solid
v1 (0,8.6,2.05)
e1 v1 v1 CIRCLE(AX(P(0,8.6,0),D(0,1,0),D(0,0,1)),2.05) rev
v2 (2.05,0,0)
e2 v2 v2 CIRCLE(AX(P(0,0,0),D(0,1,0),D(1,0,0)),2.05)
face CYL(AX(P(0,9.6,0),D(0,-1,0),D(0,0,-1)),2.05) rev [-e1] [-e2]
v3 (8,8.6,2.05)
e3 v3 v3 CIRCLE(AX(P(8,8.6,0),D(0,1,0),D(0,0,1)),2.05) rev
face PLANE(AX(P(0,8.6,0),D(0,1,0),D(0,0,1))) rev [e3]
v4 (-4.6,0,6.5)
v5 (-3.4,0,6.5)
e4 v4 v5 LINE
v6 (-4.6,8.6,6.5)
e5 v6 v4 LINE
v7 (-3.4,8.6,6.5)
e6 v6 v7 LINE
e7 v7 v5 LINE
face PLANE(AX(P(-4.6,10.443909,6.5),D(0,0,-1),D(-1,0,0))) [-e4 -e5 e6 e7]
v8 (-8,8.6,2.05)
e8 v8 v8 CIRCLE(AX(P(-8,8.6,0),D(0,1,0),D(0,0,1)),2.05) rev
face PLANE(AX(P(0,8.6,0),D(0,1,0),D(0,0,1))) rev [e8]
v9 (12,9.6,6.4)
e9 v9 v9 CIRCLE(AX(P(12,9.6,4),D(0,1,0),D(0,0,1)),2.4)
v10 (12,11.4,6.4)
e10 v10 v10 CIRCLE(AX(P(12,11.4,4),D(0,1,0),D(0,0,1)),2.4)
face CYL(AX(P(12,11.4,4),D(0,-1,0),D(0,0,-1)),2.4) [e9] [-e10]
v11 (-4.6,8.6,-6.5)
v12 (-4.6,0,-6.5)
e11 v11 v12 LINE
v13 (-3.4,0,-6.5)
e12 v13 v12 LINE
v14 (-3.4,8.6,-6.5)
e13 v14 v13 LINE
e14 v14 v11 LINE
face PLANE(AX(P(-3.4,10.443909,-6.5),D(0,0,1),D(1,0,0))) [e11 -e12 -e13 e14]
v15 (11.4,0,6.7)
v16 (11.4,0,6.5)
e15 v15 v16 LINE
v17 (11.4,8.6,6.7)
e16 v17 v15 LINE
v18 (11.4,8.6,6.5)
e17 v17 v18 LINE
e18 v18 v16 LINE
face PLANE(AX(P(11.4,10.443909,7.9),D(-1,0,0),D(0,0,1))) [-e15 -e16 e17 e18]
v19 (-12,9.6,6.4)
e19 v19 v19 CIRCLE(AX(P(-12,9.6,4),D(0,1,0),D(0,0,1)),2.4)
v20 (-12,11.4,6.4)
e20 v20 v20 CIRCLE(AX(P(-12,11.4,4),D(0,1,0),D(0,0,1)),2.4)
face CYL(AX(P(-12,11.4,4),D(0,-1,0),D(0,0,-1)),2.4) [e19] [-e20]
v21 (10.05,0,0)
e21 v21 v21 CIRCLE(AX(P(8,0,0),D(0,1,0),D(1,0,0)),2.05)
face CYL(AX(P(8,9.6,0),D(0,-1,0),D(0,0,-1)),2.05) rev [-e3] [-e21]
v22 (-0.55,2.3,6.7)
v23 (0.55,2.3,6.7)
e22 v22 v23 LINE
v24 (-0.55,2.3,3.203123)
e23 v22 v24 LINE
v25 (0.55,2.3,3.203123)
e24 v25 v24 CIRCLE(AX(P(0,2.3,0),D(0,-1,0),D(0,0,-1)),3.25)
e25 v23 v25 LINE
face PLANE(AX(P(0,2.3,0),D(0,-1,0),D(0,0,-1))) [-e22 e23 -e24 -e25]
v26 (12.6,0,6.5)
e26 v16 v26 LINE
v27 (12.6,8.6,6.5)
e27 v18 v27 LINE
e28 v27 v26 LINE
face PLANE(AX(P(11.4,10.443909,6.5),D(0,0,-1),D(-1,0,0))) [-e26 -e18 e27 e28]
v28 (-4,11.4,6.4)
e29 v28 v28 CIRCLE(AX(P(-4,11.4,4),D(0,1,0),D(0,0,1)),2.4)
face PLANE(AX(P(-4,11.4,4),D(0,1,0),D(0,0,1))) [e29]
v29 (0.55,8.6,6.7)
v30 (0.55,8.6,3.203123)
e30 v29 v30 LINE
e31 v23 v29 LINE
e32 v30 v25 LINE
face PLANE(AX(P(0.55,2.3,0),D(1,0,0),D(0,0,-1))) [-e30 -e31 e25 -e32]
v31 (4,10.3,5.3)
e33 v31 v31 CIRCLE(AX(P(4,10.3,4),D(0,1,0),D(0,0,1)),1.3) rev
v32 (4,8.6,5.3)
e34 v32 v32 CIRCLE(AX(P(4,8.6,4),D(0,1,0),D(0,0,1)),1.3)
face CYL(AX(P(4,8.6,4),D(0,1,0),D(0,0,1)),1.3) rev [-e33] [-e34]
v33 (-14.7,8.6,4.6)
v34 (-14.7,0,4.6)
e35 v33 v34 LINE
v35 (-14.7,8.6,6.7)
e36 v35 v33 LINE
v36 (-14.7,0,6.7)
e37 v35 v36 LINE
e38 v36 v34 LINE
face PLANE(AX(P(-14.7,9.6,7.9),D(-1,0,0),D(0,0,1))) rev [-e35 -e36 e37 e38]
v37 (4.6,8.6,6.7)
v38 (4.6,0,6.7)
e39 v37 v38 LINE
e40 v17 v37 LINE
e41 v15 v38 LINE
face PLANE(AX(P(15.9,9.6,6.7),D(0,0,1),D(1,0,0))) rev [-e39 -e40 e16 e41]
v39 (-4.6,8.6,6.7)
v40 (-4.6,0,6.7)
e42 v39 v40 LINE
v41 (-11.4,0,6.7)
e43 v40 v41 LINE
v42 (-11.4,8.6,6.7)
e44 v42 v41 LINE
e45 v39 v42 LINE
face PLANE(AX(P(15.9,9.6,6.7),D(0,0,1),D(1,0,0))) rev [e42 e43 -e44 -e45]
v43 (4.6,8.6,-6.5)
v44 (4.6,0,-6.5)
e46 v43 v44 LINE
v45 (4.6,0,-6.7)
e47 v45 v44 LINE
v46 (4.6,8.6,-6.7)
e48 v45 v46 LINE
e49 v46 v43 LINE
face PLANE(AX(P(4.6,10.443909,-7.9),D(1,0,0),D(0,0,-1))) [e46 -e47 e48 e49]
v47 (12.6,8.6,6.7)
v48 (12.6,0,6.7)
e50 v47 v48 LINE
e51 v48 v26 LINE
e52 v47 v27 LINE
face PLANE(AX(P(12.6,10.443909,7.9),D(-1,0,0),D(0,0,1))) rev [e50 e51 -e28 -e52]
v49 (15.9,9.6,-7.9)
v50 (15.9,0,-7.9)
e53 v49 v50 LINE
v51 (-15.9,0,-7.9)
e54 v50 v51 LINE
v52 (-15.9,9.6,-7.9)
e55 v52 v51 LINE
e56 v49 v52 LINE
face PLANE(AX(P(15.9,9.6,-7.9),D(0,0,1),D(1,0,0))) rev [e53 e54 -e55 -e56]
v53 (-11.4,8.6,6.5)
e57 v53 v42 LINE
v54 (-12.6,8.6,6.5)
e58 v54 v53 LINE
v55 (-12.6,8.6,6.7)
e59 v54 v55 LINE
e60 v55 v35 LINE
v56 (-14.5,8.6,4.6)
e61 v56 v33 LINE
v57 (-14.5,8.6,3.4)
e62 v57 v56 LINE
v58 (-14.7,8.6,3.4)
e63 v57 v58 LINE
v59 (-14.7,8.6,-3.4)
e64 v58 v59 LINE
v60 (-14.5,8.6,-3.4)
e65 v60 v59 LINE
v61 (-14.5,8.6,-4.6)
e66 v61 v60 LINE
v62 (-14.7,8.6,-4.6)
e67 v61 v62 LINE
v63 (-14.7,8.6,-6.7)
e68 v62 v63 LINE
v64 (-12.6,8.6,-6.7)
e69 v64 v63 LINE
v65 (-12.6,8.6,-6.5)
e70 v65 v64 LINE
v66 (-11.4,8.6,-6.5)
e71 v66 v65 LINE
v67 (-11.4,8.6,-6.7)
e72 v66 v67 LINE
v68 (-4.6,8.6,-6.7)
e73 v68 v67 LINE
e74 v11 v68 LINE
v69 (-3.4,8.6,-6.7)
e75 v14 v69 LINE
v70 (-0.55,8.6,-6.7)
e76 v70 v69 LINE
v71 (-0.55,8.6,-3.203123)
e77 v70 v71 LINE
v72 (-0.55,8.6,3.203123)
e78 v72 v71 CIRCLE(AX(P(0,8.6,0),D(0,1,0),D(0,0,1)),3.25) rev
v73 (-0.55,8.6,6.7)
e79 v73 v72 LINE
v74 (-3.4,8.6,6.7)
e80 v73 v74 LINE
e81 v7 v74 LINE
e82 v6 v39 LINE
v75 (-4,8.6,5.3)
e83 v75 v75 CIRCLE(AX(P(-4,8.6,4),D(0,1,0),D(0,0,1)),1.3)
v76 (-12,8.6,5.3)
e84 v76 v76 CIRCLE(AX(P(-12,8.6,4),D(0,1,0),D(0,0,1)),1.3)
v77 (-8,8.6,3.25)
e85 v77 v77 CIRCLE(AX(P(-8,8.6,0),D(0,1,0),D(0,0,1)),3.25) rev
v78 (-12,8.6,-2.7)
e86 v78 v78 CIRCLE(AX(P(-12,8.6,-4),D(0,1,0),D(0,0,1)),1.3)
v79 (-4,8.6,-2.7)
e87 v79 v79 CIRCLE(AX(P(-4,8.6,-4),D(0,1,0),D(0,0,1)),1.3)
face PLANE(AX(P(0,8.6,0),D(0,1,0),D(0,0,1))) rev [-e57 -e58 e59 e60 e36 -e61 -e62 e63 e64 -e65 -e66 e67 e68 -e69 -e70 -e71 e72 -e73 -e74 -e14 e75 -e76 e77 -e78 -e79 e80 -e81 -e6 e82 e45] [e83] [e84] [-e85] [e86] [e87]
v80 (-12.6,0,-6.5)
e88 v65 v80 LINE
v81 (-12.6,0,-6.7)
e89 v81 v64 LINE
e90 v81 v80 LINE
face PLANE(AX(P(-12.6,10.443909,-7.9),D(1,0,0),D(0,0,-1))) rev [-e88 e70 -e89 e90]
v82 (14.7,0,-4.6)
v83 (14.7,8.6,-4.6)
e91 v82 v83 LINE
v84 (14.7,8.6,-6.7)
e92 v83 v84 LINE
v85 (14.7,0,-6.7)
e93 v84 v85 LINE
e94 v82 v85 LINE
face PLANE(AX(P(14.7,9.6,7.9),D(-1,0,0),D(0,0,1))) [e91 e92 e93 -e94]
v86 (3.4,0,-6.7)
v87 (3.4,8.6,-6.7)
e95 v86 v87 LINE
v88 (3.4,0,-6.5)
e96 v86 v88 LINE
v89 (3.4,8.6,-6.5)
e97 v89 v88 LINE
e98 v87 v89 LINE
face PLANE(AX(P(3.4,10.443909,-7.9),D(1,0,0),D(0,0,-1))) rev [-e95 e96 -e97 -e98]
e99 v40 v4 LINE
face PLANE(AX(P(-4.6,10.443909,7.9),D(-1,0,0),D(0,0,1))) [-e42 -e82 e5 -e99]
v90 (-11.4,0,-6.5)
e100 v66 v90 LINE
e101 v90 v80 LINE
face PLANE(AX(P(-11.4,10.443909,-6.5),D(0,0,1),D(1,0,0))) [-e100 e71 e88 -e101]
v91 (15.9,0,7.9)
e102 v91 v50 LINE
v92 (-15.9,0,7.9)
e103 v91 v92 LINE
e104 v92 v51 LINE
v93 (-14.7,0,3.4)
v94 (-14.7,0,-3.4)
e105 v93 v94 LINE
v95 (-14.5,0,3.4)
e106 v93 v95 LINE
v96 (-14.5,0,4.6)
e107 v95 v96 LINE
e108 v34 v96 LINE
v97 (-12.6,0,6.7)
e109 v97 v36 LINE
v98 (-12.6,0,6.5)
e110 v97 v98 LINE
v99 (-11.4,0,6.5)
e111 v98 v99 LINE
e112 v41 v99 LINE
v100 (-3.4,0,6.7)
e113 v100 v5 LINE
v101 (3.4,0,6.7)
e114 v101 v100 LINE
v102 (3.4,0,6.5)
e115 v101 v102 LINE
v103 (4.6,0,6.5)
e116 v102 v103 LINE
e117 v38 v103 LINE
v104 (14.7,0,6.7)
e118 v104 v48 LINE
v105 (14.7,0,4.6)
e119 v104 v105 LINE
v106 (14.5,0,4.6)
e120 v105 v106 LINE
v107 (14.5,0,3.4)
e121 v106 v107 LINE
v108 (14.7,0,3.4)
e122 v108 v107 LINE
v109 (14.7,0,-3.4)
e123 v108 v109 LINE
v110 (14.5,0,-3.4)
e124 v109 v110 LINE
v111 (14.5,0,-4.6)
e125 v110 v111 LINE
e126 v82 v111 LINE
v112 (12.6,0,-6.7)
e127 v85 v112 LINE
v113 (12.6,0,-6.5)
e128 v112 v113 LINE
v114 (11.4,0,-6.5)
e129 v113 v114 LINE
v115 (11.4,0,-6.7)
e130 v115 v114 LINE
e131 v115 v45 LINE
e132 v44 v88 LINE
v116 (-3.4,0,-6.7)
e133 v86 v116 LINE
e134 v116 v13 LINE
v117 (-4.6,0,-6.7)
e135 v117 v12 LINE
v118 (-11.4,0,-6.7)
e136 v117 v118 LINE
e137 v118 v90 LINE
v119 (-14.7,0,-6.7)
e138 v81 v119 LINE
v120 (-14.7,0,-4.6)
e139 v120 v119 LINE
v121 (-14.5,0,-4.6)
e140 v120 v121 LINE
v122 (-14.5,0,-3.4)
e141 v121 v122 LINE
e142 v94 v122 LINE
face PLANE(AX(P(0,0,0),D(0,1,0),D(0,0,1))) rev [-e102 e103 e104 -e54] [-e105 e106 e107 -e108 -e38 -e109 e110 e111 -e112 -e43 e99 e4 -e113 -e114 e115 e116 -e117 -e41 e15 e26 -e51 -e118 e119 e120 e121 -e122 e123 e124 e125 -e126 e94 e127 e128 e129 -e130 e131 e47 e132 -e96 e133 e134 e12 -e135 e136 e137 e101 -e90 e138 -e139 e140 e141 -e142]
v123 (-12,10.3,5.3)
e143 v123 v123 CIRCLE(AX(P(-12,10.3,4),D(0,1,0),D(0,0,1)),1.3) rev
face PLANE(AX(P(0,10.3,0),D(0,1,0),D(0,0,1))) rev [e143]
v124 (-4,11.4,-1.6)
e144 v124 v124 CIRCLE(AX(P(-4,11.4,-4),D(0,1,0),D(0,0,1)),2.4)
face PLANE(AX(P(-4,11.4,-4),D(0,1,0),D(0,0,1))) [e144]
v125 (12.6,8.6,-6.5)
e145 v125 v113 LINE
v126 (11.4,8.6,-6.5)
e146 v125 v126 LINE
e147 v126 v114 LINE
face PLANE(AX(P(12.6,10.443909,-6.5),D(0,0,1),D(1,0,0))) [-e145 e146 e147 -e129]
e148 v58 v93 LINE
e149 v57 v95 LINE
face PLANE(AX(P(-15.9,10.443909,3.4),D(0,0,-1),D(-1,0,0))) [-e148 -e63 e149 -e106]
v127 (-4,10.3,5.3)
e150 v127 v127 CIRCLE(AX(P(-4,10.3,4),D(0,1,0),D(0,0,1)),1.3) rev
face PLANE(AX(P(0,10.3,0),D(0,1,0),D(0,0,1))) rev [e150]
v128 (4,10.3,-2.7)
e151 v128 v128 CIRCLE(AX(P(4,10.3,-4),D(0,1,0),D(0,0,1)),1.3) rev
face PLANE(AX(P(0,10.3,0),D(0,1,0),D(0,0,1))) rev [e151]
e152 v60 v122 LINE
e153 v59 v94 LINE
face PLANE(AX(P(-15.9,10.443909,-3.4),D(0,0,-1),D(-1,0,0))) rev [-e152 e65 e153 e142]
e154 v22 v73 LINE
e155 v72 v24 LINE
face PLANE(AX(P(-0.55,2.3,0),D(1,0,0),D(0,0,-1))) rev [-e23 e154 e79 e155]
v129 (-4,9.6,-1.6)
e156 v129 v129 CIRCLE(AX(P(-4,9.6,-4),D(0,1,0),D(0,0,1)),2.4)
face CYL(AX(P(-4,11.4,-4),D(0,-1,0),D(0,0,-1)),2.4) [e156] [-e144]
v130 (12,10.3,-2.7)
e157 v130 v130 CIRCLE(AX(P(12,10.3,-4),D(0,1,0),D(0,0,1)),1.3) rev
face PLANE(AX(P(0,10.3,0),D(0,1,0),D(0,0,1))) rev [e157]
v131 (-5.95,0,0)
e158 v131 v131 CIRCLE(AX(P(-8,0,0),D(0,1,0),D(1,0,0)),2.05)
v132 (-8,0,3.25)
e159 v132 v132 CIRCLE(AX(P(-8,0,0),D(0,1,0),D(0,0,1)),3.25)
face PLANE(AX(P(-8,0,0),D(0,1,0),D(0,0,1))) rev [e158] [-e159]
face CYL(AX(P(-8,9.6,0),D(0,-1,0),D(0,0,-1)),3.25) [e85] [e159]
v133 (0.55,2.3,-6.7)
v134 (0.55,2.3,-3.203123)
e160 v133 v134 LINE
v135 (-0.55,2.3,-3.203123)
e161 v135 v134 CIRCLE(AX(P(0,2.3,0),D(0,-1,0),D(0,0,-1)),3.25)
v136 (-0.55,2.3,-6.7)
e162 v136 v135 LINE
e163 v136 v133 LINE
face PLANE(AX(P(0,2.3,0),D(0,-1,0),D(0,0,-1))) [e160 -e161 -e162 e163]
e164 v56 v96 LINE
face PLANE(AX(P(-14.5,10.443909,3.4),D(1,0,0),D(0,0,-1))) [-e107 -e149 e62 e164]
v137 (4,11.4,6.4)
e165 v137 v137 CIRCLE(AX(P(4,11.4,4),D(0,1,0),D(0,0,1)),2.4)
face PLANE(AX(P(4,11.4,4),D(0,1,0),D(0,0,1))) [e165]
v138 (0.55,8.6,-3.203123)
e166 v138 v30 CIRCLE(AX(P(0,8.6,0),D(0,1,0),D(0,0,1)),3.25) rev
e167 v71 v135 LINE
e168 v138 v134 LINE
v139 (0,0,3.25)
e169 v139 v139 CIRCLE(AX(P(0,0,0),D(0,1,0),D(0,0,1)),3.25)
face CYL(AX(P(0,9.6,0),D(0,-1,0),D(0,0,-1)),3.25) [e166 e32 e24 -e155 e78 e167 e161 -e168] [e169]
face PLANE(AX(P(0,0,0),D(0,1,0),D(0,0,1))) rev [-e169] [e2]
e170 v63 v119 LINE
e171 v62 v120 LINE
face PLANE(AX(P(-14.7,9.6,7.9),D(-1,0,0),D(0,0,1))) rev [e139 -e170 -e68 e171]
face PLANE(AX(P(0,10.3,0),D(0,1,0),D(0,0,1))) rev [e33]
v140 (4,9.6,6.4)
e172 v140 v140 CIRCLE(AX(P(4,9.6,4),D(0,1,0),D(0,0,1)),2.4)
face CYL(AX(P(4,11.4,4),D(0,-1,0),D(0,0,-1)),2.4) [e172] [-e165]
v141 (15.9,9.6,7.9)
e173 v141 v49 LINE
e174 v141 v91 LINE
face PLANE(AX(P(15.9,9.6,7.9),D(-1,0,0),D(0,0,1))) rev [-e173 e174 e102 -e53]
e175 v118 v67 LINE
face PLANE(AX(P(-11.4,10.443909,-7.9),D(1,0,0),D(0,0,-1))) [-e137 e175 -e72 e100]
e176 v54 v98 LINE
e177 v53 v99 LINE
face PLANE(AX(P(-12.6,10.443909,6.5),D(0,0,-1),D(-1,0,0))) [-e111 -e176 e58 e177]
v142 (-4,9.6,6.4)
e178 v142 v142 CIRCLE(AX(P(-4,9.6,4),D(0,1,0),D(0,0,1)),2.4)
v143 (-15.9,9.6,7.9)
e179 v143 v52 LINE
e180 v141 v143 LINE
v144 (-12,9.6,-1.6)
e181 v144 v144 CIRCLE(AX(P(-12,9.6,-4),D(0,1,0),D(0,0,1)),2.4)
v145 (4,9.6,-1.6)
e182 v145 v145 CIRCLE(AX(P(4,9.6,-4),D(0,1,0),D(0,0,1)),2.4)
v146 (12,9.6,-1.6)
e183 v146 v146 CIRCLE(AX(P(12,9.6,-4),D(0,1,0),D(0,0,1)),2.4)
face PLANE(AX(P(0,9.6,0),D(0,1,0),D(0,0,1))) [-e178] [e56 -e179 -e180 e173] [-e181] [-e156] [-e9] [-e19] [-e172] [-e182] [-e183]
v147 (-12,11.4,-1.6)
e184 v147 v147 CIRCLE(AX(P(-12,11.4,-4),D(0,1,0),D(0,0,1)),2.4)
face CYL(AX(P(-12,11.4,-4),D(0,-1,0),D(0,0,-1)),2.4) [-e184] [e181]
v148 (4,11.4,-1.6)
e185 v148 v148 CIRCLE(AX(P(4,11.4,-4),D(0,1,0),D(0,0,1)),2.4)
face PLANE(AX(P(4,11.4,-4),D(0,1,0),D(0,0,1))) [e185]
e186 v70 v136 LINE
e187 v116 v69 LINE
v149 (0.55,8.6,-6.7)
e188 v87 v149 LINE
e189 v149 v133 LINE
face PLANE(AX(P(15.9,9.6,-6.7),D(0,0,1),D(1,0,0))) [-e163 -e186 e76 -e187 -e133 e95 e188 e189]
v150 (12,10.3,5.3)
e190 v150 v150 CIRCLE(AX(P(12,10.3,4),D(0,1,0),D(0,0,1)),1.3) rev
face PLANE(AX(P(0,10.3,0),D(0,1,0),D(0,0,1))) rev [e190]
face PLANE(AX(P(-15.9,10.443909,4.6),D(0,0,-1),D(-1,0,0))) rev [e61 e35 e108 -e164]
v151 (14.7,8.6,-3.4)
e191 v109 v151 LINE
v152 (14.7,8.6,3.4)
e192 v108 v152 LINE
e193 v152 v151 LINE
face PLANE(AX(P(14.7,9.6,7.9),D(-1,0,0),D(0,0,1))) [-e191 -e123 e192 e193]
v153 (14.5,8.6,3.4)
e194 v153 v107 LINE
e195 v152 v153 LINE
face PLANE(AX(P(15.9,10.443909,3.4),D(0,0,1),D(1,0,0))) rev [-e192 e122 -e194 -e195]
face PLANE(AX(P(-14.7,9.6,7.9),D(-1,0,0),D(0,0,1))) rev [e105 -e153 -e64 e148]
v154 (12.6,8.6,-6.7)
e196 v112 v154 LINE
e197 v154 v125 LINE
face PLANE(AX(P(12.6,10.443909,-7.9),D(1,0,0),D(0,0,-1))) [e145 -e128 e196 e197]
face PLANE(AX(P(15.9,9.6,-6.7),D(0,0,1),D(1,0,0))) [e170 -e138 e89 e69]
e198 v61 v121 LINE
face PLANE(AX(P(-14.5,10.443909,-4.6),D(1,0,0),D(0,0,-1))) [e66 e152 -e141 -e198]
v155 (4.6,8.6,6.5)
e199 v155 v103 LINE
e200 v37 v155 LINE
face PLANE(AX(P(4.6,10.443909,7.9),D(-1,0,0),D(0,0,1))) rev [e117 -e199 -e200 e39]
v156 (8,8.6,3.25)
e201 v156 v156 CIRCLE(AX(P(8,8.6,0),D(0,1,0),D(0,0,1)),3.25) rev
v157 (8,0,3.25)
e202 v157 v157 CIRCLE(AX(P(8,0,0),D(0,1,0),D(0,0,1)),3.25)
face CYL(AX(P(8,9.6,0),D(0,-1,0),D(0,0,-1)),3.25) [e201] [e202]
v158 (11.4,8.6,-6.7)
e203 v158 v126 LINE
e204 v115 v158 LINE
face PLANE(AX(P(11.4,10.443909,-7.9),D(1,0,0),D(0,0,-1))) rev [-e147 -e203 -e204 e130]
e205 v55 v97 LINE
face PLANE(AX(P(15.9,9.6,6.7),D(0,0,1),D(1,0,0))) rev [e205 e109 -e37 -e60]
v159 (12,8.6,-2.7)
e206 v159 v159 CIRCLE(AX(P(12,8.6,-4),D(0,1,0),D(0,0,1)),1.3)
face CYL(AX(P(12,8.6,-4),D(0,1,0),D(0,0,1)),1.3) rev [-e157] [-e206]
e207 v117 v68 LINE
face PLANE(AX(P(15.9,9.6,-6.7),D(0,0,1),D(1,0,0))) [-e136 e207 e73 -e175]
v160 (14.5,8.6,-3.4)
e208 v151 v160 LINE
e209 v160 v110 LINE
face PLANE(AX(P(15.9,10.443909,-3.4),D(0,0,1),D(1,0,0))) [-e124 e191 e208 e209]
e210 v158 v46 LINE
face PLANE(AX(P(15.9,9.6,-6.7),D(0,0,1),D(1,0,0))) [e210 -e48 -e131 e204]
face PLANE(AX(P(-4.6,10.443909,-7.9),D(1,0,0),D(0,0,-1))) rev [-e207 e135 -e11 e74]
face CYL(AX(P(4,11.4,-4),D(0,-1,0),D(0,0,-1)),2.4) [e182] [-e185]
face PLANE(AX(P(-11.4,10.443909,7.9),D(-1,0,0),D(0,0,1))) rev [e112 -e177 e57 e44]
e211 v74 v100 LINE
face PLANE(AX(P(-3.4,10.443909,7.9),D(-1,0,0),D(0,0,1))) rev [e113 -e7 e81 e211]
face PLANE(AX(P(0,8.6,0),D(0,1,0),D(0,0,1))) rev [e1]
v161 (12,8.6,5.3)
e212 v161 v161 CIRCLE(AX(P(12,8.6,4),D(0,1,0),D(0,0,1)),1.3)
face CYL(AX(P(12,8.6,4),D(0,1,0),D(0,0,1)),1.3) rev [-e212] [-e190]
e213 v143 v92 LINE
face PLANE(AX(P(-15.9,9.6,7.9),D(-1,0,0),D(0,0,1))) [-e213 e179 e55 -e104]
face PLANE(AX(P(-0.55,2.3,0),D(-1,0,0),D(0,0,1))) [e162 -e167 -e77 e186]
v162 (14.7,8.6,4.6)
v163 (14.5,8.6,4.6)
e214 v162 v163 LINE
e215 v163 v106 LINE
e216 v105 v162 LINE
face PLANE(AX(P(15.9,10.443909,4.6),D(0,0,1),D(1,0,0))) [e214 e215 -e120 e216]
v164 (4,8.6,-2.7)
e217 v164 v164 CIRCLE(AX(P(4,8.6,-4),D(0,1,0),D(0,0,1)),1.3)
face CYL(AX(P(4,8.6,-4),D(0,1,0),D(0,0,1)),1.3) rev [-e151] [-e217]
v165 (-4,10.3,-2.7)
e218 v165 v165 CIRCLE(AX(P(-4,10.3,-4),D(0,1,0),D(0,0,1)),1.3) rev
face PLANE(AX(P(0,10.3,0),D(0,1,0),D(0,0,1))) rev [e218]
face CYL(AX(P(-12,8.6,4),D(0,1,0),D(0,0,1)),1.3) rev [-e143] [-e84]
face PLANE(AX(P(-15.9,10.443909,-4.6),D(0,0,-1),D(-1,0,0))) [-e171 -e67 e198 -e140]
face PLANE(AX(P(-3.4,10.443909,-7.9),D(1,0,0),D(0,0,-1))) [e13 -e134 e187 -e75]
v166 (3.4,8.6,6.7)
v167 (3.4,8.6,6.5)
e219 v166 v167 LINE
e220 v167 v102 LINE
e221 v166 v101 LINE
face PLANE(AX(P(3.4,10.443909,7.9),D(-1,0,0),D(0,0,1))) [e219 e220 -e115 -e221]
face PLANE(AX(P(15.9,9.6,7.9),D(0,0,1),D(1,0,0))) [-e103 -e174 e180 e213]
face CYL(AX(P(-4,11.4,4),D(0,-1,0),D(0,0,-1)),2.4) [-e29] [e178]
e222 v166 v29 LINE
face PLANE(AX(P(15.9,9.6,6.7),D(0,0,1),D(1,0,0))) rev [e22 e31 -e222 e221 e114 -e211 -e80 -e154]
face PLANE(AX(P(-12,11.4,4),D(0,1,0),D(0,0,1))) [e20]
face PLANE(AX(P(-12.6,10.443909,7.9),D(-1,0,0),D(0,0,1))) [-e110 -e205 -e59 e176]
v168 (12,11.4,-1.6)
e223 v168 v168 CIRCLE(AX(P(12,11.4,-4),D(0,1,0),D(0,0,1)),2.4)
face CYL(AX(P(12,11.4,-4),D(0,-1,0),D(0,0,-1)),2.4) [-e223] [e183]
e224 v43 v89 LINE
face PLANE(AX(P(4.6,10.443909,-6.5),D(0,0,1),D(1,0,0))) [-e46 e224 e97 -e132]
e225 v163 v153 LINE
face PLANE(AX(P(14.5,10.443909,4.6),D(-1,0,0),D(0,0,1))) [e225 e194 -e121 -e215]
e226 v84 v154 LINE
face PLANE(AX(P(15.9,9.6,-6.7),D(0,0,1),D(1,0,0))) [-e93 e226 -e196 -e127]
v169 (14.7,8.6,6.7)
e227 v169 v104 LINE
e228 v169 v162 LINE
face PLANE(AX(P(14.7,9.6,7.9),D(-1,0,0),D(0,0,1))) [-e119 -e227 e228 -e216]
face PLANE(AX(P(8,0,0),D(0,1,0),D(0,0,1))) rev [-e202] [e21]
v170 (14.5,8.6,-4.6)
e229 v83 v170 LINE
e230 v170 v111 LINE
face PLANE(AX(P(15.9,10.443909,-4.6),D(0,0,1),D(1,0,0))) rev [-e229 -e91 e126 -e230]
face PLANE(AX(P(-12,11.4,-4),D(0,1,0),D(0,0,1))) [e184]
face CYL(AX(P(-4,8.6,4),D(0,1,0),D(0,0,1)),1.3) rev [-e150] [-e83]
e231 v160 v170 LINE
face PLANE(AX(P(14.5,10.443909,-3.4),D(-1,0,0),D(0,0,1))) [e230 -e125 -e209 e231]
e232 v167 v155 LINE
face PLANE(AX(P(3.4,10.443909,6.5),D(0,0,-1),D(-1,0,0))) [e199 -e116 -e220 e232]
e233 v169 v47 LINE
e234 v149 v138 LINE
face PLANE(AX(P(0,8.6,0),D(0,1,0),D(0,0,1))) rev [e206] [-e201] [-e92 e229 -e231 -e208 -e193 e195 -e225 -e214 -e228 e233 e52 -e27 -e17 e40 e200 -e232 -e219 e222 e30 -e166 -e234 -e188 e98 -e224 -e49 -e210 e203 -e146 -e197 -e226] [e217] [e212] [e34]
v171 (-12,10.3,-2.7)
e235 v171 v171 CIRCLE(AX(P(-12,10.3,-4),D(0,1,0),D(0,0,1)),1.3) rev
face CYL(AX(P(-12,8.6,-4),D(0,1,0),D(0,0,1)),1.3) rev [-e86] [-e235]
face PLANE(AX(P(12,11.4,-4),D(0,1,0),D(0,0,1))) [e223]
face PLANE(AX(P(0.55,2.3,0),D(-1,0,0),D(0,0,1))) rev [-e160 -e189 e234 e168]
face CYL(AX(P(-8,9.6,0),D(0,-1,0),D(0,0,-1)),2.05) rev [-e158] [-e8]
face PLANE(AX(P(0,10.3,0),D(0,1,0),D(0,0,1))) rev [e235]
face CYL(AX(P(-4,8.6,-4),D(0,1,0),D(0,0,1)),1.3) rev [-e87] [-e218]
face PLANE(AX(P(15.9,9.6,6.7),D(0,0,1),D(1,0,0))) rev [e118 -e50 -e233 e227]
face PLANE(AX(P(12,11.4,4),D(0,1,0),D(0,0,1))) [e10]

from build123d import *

# Parameters (mm, degrees)
EXTRUDE_THIN1_OUTLINE_W   = 31.8
EXTRUDE_THIN1_OUTLINE_H   = 15.8
EXTRUDE_THIN1_OUTLINE_W_2 = 29.4
EXTRUDE_THIN1_OUTLINE_H_2 = 13.4
EXTRUDE_THIN1_OUTLINE_R   = 3.25
EXTRUDE_THIN1_OUTLINE_R_2 = 2.05
EXTRUDE_THIN1_DEPTH       = 9.6
BOSS_EXTRUDE1_START       = 8.6
SKETCH1_3_R               = 1.3
SKETCH1_3_R_2             = 3.25
SKETCH1_3_R_3             = 2.05
BOSS_EXTRUDE1_DEPTH       = 1
EXTRUDE_THIN2_START       = 9.6
SKETCH1_4_R               = 2.4
SKETCH1_4_R_2             = 1.3
EXTRUDE_THIN2_DEPTH       = 1.8
BOSS_EXTRUDE2_START       = 10.3
SKETCH1_5_R               = 1.3
BOSS_EXTRUDE2_DEPTH       = 1.1
EXTRUDE_THIN3_START       = 8.6
SKETCH1_7_W               = 1.1
SKETCH1_7_H               = 5.65
EXTRUDE_THIN3_DEPTH       = 6.3
SKETCH1_8_W               = 1.2
SKETCH1_8_H               = 1.4
SKETCH1_8_W_2             = 1.4
SKETCH1_8_H_2             = 1.2
EXTRUDE_THIN4_DEPTH       = 8.6


# Read off the part's stored shape, not the designer's step: Extrude-Thin1
with BuildPart() as part:
    # Extrude-Thin1 outline → Extrude-Thin1 (new body)
    # profile 1 of 4: a face of its own
    with BuildSketch(Plane(origin=(0, 0, 0), x_dir=(1, 0, 0), z_dir=(0, 1, 0))):
        Rectangle(EXTRUDE_THIN1_OUTLINE_W, EXTRUDE_THIN1_OUTLINE_H)
        Rectangle(EXTRUDE_THIN1_OUTLINE_W_2, EXTRUDE_THIN1_OUTLINE_H_2, mode=Mode.SUBTRACT)
    # profile 2 of 4: a face of its own
    with BuildSketch(Plane(origin=(0, 0, 0), x_dir=(1, 0, 0), z_dir=(0, 1, 0))):
        with Locations((-8, 0)):
            Circle(EXTRUDE_THIN1_OUTLINE_R)
        with Locations((-8, 0)):
            Circle(EXTRUDE_THIN1_OUTLINE_R_2, mode=Mode.SUBTRACT)
    # profile 3 of 4: a face of its own
    with BuildSketch(Plane(origin=(0, 0, 0), x_dir=(1, 0, 0), z_dir=(0, 1, 0))):
        Circle(EXTRUDE_THIN1_OUTLINE_R)
        Circle(EXTRUDE_THIN1_OUTLINE_R_2, mode=Mode.SUBTRACT)
    # profile 4 of 4: a face of its own
    with BuildSketch(Plane(origin=(0, 0, 0), x_dir=(1, 0, 0), z_dir=(0, 1, 0))):
        with Locations((8, 0)):
            Circle(EXTRUDE_THIN1_OUTLINE_R)
        with Locations((8, 0)):
            Circle(EXTRUDE_THIN1_OUTLINE_R_2, mode=Mode.SUBTRACT)
    extrude(amount=EXTRUDE_THIN1_DEPTH)

    # Sketch1<3> → Boss-Extrude1 (add)
    # profile 1 of 4: a face of its own
    with BuildSketch(Plane(origin=(0, 0, 0), x_dir=(1, 0, 0), z_dir=(0, 1, 0)).offset(BOSS_EXTRUDE1_START)):
        Polygon((4, 6.7), (-4, 6.7), (-12, 6.7), (-14.7, 6.7), (-14.7, 4), (-14.7, -4), (-14.7, -6.7), (-12, -6.7), (-4, -6.7), (4, -6.7), (12, -6.7), (14.7, -6.7), (14.7, -4), (14.7, 4), (14.7, 6.7), (12, 6.7), align=None)
        with BuildLine():
            ThreePointArc((3.25, 0), (0, -3.25), (-3.25, 0))
            ThreePointArc((-3.25, 0), (0, 3.25), (3.25, 0))
        make_face(mode=Mode.SUBTRACT)
        with Locations(Location((4, -4, 0), (0, 0, 270))):
            Circle(SKETCH1_3_R, mode=Mode.SUBTRACT)
        with Locations(Location((12, -4, 0), (0, 0, 270))):
            Circle(SKETCH1_3_R, mode=Mode.SUBTRACT)
        with Locations(Location((4, 4, 0), (0, 0, 270))):
            Circle(SKETCH1_3_R, mode=Mode.SUBTRACT)
        with Locations(Location((8, 0, 0), (0, 0, 270))):
            Circle(SKETCH1_3_R_2, mode=Mode.SUBTRACT)
        with Locations(Location((12, 4, 0), (0, 0, 270))):
            Circle(SKETCH1_3_R, mode=Mode.SUBTRACT)
        with Locations(Location((-12, -4, 0), (0, 0, 270))):
            Circle(SKETCH1_3_R, mode=Mode.SUBTRACT)
        with Locations(Location((-4, -4, 0), (0, 0, 270))):
            Circle(SKETCH1_3_R, mode=Mode.SUBTRACT)
        with Locations(Location((-8, 0, 0), (0, 0, 270))):
            Circle(SKETCH1_3_R_2, mode=Mode.SUBTRACT)
        with Locations(Location((-12, 4, 0), (0, 0, 270))):
            Circle(SKETCH1_3_R, mode=Mode.SUBTRACT)
        with Locations(Location((-4, 4, 0), (0, 0, 270))):
            Circle(SKETCH1_3_R, mode=Mode.SUBTRACT)
    # profile 2 of 4: a face of its own
    with BuildSketch(Plane(origin=(0, 0, 0), x_dir=(1, 0, 0), z_dir=(0, 1, 0)).offset(BOSS_EXTRUDE1_START)):
        with Locations((8, 0)):
            Circle(SKETCH1_3_R_3)
    # profile 3 of 4: a face of its own
    with BuildSketch(Plane(origin=(0, 0, 0), x_dir=(1, 0, 0), z_dir=(0, 1, 0)).offset(BOSS_EXTRUDE1_START)):
        Circle(SKETCH1_3_R_3)
    # profile 4 of 4: a face of its own
    with BuildSketch(Plane(origin=(0, 0, 0), x_dir=(1, 0, 0), z_dir=(0, 1, 0)).offset(BOSS_EXTRUDE1_START)):
        with Locations((-8, 0)):
            Circle(SKETCH1_3_R_3)
    extrude(amount=BOSS_EXTRUDE1_DEPTH)

    # Sketch1<4> → Extrude-Thin2 (add)
    # profile 1 of 8: a face of its own
    with BuildSketch(Plane(origin=(0, 0, 0), x_dir=(1, 0, 0), z_dir=(0, 1, 0)).offset(EXTRUDE_THIN2_START)):
        with Locations((-12, 4)):
            Circle(SKETCH1_4_R)
        with Locations((-12, 4)):
            Circle(SKETCH1_4_R_2, mode=Mode.SUBTRACT)
    # profile 2 of 8: a face of its own
    with BuildSketch(Plane(origin=(0, 0, 0), x_dir=(1, 0, 0), z_dir=(0, 1, 0)).offset(EXTRUDE_THIN2_START)):
        with Locations((-4, 4)):
            Circle(SKETCH1_4_R)
        with Locations((-4, 4)):
            Circle(SKETCH1_4_R_2, mode=Mode.SUBTRACT)
    # profile 3 of 8: a face of its own
    with BuildSketch(Plane(origin=(0, 0, 0), x_dir=(1, 0, 0), z_dir=(0, 1, 0)).offset(EXTRUDE_THIN2_START)):
        with Locations((4, 4)):
            Circle(SKETCH1_4_R)
        with Locations((4, 4)):
            Circle(SKETCH1_4_R_2, mode=Mode.SUBTRACT)
    # profile 4 of 8: a face of its own
    with BuildSketch(Plane(origin=(0, 0, 0), x_dir=(1, 0, 0), z_dir=(0, 1, 0)).offset(EXTRUDE_THIN2_START)):
        with Locations((12, 4)):
            Circle(SKETCH1_4_R)
        with Locations((12, 4)):
            Circle(SKETCH1_4_R_2, mode=Mode.SUBTRACT)
    # profile 5 of 8: a face of its own
    with BuildSketch(Plane(origin=(0, 0, 0), x_dir=(1, 0, 0), z_dir=(0, 1, 0)).offset(EXTRUDE_THIN2_START)):
        with Locations((12, -4)):
            Circle(SKETCH1_4_R)
        with Locations((12, -4)):
            Circle(SKETCH1_4_R_2, mode=Mode.SUBTRACT)
    # profile 6 of 8: a face of its own
    with BuildSketch(Plane(origin=(0, 0, 0), x_dir=(1, 0, 0), z_dir=(0, 1, 0)).offset(EXTRUDE_THIN2_START)):
        with Locations((4, -4)):
            Circle(SKETCH1_4_R)
        with Locations((4, -4)):
            Circle(SKETCH1_4_R_2, mode=Mode.SUBTRACT)
    # profile 7 of 8: a face of its own
    with BuildSketch(Plane(origin=(0, 0, 0), x_dir=(1, 0, 0), z_dir=(0, 1, 0)).offset(EXTRUDE_THIN2_START)):
        with Locations((-4, -4)):
            Circle(SKETCH1_4_R)
        with Locations((-4, -4)):
            Circle(SKETCH1_4_R_2, mode=Mode.SUBTRACT)
    # profile 8 of 8: a face of its own
    with BuildSketch(Plane(origin=(0, 0, 0), x_dir=(1, 0, 0), z_dir=(0, 1, 0)).offset(EXTRUDE_THIN2_START)):
        with Locations((-12, -4)):
            Circle(SKETCH1_4_R)
        with Locations((-12, -4)):
            Circle(SKETCH1_4_R_2, mode=Mode.SUBTRACT)
    extrude(amount=EXTRUDE_THIN2_DEPTH)

    # Sketch1<5> → Boss-Extrude2 (add)
    with BuildSketch(Plane(origin=(0, 0, 0), x_dir=(1, 0, 0), z_dir=(0, 1, 0)).offset(BOSS_EXTRUDE2_START)):
        with Locations(Location((-12, -4, 0), (0, 0, 270))):
            Circle(SKETCH1_5_R)
        with Locations(Location((-12, 4, 0), (0, 0, 270))):
            Circle(SKETCH1_5_R)
        with Locations(Location((-4, 4, 0), (0, 0, 270))):
            Circle(SKETCH1_5_R)
        with Locations(Location((-4, -4, 0), (0, 0, 270))):
            Circle(SKETCH1_5_R)
        with Locations(Location((4, -4, 0), (0, 0, 270))):
            Circle(SKETCH1_5_R)
        with Locations(Location((4, 4, 0), (0, 0, 270))):
            Circle(SKETCH1_5_R)
        with Locations(Location((12, 4, 0), (0, 0, 270))):
            Circle(SKETCH1_5_R)
        with Locations(Location((12, -4, 0), (0, 0, 270))):
            Circle(SKETCH1_5_R)
    extrude(amount=BOSS_EXTRUDE2_DEPTH)

    # Sketch1<7> → Extrude-Thin3 (add)
    with BuildSketch(Plane(origin=(0, 0, 0), x_dir=(1, 0, 0), z_dir=(0, 1, 0)).offset(EXTRUDE_THIN3_START)):
        with Locations((0, 5.075)):
            Rectangle(SKETCH1_7_W, SKETCH1_7_H)
        with Locations((0, -5.075)):
            Rectangle(SKETCH1_7_W, SKETCH1_7_H)
    extrude(amount=-EXTRUDE_THIN3_DEPTH)

    # Sketch1<8> → Extrude-Thin4 (add)
    with BuildSketch(Plane(origin=(0, 0, 0), x_dir=(1, 0, 0), z_dir=(0, 1, 0))):
        with Locations((4, -7.2)):
            Rectangle(SKETCH1_8_W, SKETCH1_8_H)
        with Locations((12, -7.2)):
            Rectangle(SKETCH1_8_W, SKETCH1_8_H)
        with Locations((15.2, -4)):
            Rectangle(SKETCH1_8_W_2, SKETCH1_8_H_2)
        with Locations((15.2, 4)):
            Rectangle(SKETCH1_8_W_2, SKETCH1_8_H_2)
        with Locations((12, 7.2)):
            Rectangle(SKETCH1_8_W, SKETCH1_8_H)
        with Locations((4, 7.2)):
            Rectangle(SKETCH1_8_W, SKETCH1_8_H)
        with Locations((-4, 7.2)):
            Rectangle(SKETCH1_8_W, SKETCH1_8_H)
        with Locations((-12, 7.2)):
            Rectangle(SKETCH1_8_W, SKETCH1_8_H)
        with Locations((-15.2, 4)):
            Rectangle(SKETCH1_8_W_2, SKETCH1_8_H_2)
        with Locations((-15.2, -4)):
            Rectangle(SKETCH1_8_W_2, SKETCH1_8_H_2)
        with Locations((-12, -7.2)):
            Rectangle(SKETCH1_8_W, SKETCH1_8_H)
        with Locations((-4, -7.2)):
            Rectangle(SKETCH1_8_W, SKETCH1_8_H)
    extrude(amount=EXTRUDE_THIN4_DEPTH)


solid = part.part
